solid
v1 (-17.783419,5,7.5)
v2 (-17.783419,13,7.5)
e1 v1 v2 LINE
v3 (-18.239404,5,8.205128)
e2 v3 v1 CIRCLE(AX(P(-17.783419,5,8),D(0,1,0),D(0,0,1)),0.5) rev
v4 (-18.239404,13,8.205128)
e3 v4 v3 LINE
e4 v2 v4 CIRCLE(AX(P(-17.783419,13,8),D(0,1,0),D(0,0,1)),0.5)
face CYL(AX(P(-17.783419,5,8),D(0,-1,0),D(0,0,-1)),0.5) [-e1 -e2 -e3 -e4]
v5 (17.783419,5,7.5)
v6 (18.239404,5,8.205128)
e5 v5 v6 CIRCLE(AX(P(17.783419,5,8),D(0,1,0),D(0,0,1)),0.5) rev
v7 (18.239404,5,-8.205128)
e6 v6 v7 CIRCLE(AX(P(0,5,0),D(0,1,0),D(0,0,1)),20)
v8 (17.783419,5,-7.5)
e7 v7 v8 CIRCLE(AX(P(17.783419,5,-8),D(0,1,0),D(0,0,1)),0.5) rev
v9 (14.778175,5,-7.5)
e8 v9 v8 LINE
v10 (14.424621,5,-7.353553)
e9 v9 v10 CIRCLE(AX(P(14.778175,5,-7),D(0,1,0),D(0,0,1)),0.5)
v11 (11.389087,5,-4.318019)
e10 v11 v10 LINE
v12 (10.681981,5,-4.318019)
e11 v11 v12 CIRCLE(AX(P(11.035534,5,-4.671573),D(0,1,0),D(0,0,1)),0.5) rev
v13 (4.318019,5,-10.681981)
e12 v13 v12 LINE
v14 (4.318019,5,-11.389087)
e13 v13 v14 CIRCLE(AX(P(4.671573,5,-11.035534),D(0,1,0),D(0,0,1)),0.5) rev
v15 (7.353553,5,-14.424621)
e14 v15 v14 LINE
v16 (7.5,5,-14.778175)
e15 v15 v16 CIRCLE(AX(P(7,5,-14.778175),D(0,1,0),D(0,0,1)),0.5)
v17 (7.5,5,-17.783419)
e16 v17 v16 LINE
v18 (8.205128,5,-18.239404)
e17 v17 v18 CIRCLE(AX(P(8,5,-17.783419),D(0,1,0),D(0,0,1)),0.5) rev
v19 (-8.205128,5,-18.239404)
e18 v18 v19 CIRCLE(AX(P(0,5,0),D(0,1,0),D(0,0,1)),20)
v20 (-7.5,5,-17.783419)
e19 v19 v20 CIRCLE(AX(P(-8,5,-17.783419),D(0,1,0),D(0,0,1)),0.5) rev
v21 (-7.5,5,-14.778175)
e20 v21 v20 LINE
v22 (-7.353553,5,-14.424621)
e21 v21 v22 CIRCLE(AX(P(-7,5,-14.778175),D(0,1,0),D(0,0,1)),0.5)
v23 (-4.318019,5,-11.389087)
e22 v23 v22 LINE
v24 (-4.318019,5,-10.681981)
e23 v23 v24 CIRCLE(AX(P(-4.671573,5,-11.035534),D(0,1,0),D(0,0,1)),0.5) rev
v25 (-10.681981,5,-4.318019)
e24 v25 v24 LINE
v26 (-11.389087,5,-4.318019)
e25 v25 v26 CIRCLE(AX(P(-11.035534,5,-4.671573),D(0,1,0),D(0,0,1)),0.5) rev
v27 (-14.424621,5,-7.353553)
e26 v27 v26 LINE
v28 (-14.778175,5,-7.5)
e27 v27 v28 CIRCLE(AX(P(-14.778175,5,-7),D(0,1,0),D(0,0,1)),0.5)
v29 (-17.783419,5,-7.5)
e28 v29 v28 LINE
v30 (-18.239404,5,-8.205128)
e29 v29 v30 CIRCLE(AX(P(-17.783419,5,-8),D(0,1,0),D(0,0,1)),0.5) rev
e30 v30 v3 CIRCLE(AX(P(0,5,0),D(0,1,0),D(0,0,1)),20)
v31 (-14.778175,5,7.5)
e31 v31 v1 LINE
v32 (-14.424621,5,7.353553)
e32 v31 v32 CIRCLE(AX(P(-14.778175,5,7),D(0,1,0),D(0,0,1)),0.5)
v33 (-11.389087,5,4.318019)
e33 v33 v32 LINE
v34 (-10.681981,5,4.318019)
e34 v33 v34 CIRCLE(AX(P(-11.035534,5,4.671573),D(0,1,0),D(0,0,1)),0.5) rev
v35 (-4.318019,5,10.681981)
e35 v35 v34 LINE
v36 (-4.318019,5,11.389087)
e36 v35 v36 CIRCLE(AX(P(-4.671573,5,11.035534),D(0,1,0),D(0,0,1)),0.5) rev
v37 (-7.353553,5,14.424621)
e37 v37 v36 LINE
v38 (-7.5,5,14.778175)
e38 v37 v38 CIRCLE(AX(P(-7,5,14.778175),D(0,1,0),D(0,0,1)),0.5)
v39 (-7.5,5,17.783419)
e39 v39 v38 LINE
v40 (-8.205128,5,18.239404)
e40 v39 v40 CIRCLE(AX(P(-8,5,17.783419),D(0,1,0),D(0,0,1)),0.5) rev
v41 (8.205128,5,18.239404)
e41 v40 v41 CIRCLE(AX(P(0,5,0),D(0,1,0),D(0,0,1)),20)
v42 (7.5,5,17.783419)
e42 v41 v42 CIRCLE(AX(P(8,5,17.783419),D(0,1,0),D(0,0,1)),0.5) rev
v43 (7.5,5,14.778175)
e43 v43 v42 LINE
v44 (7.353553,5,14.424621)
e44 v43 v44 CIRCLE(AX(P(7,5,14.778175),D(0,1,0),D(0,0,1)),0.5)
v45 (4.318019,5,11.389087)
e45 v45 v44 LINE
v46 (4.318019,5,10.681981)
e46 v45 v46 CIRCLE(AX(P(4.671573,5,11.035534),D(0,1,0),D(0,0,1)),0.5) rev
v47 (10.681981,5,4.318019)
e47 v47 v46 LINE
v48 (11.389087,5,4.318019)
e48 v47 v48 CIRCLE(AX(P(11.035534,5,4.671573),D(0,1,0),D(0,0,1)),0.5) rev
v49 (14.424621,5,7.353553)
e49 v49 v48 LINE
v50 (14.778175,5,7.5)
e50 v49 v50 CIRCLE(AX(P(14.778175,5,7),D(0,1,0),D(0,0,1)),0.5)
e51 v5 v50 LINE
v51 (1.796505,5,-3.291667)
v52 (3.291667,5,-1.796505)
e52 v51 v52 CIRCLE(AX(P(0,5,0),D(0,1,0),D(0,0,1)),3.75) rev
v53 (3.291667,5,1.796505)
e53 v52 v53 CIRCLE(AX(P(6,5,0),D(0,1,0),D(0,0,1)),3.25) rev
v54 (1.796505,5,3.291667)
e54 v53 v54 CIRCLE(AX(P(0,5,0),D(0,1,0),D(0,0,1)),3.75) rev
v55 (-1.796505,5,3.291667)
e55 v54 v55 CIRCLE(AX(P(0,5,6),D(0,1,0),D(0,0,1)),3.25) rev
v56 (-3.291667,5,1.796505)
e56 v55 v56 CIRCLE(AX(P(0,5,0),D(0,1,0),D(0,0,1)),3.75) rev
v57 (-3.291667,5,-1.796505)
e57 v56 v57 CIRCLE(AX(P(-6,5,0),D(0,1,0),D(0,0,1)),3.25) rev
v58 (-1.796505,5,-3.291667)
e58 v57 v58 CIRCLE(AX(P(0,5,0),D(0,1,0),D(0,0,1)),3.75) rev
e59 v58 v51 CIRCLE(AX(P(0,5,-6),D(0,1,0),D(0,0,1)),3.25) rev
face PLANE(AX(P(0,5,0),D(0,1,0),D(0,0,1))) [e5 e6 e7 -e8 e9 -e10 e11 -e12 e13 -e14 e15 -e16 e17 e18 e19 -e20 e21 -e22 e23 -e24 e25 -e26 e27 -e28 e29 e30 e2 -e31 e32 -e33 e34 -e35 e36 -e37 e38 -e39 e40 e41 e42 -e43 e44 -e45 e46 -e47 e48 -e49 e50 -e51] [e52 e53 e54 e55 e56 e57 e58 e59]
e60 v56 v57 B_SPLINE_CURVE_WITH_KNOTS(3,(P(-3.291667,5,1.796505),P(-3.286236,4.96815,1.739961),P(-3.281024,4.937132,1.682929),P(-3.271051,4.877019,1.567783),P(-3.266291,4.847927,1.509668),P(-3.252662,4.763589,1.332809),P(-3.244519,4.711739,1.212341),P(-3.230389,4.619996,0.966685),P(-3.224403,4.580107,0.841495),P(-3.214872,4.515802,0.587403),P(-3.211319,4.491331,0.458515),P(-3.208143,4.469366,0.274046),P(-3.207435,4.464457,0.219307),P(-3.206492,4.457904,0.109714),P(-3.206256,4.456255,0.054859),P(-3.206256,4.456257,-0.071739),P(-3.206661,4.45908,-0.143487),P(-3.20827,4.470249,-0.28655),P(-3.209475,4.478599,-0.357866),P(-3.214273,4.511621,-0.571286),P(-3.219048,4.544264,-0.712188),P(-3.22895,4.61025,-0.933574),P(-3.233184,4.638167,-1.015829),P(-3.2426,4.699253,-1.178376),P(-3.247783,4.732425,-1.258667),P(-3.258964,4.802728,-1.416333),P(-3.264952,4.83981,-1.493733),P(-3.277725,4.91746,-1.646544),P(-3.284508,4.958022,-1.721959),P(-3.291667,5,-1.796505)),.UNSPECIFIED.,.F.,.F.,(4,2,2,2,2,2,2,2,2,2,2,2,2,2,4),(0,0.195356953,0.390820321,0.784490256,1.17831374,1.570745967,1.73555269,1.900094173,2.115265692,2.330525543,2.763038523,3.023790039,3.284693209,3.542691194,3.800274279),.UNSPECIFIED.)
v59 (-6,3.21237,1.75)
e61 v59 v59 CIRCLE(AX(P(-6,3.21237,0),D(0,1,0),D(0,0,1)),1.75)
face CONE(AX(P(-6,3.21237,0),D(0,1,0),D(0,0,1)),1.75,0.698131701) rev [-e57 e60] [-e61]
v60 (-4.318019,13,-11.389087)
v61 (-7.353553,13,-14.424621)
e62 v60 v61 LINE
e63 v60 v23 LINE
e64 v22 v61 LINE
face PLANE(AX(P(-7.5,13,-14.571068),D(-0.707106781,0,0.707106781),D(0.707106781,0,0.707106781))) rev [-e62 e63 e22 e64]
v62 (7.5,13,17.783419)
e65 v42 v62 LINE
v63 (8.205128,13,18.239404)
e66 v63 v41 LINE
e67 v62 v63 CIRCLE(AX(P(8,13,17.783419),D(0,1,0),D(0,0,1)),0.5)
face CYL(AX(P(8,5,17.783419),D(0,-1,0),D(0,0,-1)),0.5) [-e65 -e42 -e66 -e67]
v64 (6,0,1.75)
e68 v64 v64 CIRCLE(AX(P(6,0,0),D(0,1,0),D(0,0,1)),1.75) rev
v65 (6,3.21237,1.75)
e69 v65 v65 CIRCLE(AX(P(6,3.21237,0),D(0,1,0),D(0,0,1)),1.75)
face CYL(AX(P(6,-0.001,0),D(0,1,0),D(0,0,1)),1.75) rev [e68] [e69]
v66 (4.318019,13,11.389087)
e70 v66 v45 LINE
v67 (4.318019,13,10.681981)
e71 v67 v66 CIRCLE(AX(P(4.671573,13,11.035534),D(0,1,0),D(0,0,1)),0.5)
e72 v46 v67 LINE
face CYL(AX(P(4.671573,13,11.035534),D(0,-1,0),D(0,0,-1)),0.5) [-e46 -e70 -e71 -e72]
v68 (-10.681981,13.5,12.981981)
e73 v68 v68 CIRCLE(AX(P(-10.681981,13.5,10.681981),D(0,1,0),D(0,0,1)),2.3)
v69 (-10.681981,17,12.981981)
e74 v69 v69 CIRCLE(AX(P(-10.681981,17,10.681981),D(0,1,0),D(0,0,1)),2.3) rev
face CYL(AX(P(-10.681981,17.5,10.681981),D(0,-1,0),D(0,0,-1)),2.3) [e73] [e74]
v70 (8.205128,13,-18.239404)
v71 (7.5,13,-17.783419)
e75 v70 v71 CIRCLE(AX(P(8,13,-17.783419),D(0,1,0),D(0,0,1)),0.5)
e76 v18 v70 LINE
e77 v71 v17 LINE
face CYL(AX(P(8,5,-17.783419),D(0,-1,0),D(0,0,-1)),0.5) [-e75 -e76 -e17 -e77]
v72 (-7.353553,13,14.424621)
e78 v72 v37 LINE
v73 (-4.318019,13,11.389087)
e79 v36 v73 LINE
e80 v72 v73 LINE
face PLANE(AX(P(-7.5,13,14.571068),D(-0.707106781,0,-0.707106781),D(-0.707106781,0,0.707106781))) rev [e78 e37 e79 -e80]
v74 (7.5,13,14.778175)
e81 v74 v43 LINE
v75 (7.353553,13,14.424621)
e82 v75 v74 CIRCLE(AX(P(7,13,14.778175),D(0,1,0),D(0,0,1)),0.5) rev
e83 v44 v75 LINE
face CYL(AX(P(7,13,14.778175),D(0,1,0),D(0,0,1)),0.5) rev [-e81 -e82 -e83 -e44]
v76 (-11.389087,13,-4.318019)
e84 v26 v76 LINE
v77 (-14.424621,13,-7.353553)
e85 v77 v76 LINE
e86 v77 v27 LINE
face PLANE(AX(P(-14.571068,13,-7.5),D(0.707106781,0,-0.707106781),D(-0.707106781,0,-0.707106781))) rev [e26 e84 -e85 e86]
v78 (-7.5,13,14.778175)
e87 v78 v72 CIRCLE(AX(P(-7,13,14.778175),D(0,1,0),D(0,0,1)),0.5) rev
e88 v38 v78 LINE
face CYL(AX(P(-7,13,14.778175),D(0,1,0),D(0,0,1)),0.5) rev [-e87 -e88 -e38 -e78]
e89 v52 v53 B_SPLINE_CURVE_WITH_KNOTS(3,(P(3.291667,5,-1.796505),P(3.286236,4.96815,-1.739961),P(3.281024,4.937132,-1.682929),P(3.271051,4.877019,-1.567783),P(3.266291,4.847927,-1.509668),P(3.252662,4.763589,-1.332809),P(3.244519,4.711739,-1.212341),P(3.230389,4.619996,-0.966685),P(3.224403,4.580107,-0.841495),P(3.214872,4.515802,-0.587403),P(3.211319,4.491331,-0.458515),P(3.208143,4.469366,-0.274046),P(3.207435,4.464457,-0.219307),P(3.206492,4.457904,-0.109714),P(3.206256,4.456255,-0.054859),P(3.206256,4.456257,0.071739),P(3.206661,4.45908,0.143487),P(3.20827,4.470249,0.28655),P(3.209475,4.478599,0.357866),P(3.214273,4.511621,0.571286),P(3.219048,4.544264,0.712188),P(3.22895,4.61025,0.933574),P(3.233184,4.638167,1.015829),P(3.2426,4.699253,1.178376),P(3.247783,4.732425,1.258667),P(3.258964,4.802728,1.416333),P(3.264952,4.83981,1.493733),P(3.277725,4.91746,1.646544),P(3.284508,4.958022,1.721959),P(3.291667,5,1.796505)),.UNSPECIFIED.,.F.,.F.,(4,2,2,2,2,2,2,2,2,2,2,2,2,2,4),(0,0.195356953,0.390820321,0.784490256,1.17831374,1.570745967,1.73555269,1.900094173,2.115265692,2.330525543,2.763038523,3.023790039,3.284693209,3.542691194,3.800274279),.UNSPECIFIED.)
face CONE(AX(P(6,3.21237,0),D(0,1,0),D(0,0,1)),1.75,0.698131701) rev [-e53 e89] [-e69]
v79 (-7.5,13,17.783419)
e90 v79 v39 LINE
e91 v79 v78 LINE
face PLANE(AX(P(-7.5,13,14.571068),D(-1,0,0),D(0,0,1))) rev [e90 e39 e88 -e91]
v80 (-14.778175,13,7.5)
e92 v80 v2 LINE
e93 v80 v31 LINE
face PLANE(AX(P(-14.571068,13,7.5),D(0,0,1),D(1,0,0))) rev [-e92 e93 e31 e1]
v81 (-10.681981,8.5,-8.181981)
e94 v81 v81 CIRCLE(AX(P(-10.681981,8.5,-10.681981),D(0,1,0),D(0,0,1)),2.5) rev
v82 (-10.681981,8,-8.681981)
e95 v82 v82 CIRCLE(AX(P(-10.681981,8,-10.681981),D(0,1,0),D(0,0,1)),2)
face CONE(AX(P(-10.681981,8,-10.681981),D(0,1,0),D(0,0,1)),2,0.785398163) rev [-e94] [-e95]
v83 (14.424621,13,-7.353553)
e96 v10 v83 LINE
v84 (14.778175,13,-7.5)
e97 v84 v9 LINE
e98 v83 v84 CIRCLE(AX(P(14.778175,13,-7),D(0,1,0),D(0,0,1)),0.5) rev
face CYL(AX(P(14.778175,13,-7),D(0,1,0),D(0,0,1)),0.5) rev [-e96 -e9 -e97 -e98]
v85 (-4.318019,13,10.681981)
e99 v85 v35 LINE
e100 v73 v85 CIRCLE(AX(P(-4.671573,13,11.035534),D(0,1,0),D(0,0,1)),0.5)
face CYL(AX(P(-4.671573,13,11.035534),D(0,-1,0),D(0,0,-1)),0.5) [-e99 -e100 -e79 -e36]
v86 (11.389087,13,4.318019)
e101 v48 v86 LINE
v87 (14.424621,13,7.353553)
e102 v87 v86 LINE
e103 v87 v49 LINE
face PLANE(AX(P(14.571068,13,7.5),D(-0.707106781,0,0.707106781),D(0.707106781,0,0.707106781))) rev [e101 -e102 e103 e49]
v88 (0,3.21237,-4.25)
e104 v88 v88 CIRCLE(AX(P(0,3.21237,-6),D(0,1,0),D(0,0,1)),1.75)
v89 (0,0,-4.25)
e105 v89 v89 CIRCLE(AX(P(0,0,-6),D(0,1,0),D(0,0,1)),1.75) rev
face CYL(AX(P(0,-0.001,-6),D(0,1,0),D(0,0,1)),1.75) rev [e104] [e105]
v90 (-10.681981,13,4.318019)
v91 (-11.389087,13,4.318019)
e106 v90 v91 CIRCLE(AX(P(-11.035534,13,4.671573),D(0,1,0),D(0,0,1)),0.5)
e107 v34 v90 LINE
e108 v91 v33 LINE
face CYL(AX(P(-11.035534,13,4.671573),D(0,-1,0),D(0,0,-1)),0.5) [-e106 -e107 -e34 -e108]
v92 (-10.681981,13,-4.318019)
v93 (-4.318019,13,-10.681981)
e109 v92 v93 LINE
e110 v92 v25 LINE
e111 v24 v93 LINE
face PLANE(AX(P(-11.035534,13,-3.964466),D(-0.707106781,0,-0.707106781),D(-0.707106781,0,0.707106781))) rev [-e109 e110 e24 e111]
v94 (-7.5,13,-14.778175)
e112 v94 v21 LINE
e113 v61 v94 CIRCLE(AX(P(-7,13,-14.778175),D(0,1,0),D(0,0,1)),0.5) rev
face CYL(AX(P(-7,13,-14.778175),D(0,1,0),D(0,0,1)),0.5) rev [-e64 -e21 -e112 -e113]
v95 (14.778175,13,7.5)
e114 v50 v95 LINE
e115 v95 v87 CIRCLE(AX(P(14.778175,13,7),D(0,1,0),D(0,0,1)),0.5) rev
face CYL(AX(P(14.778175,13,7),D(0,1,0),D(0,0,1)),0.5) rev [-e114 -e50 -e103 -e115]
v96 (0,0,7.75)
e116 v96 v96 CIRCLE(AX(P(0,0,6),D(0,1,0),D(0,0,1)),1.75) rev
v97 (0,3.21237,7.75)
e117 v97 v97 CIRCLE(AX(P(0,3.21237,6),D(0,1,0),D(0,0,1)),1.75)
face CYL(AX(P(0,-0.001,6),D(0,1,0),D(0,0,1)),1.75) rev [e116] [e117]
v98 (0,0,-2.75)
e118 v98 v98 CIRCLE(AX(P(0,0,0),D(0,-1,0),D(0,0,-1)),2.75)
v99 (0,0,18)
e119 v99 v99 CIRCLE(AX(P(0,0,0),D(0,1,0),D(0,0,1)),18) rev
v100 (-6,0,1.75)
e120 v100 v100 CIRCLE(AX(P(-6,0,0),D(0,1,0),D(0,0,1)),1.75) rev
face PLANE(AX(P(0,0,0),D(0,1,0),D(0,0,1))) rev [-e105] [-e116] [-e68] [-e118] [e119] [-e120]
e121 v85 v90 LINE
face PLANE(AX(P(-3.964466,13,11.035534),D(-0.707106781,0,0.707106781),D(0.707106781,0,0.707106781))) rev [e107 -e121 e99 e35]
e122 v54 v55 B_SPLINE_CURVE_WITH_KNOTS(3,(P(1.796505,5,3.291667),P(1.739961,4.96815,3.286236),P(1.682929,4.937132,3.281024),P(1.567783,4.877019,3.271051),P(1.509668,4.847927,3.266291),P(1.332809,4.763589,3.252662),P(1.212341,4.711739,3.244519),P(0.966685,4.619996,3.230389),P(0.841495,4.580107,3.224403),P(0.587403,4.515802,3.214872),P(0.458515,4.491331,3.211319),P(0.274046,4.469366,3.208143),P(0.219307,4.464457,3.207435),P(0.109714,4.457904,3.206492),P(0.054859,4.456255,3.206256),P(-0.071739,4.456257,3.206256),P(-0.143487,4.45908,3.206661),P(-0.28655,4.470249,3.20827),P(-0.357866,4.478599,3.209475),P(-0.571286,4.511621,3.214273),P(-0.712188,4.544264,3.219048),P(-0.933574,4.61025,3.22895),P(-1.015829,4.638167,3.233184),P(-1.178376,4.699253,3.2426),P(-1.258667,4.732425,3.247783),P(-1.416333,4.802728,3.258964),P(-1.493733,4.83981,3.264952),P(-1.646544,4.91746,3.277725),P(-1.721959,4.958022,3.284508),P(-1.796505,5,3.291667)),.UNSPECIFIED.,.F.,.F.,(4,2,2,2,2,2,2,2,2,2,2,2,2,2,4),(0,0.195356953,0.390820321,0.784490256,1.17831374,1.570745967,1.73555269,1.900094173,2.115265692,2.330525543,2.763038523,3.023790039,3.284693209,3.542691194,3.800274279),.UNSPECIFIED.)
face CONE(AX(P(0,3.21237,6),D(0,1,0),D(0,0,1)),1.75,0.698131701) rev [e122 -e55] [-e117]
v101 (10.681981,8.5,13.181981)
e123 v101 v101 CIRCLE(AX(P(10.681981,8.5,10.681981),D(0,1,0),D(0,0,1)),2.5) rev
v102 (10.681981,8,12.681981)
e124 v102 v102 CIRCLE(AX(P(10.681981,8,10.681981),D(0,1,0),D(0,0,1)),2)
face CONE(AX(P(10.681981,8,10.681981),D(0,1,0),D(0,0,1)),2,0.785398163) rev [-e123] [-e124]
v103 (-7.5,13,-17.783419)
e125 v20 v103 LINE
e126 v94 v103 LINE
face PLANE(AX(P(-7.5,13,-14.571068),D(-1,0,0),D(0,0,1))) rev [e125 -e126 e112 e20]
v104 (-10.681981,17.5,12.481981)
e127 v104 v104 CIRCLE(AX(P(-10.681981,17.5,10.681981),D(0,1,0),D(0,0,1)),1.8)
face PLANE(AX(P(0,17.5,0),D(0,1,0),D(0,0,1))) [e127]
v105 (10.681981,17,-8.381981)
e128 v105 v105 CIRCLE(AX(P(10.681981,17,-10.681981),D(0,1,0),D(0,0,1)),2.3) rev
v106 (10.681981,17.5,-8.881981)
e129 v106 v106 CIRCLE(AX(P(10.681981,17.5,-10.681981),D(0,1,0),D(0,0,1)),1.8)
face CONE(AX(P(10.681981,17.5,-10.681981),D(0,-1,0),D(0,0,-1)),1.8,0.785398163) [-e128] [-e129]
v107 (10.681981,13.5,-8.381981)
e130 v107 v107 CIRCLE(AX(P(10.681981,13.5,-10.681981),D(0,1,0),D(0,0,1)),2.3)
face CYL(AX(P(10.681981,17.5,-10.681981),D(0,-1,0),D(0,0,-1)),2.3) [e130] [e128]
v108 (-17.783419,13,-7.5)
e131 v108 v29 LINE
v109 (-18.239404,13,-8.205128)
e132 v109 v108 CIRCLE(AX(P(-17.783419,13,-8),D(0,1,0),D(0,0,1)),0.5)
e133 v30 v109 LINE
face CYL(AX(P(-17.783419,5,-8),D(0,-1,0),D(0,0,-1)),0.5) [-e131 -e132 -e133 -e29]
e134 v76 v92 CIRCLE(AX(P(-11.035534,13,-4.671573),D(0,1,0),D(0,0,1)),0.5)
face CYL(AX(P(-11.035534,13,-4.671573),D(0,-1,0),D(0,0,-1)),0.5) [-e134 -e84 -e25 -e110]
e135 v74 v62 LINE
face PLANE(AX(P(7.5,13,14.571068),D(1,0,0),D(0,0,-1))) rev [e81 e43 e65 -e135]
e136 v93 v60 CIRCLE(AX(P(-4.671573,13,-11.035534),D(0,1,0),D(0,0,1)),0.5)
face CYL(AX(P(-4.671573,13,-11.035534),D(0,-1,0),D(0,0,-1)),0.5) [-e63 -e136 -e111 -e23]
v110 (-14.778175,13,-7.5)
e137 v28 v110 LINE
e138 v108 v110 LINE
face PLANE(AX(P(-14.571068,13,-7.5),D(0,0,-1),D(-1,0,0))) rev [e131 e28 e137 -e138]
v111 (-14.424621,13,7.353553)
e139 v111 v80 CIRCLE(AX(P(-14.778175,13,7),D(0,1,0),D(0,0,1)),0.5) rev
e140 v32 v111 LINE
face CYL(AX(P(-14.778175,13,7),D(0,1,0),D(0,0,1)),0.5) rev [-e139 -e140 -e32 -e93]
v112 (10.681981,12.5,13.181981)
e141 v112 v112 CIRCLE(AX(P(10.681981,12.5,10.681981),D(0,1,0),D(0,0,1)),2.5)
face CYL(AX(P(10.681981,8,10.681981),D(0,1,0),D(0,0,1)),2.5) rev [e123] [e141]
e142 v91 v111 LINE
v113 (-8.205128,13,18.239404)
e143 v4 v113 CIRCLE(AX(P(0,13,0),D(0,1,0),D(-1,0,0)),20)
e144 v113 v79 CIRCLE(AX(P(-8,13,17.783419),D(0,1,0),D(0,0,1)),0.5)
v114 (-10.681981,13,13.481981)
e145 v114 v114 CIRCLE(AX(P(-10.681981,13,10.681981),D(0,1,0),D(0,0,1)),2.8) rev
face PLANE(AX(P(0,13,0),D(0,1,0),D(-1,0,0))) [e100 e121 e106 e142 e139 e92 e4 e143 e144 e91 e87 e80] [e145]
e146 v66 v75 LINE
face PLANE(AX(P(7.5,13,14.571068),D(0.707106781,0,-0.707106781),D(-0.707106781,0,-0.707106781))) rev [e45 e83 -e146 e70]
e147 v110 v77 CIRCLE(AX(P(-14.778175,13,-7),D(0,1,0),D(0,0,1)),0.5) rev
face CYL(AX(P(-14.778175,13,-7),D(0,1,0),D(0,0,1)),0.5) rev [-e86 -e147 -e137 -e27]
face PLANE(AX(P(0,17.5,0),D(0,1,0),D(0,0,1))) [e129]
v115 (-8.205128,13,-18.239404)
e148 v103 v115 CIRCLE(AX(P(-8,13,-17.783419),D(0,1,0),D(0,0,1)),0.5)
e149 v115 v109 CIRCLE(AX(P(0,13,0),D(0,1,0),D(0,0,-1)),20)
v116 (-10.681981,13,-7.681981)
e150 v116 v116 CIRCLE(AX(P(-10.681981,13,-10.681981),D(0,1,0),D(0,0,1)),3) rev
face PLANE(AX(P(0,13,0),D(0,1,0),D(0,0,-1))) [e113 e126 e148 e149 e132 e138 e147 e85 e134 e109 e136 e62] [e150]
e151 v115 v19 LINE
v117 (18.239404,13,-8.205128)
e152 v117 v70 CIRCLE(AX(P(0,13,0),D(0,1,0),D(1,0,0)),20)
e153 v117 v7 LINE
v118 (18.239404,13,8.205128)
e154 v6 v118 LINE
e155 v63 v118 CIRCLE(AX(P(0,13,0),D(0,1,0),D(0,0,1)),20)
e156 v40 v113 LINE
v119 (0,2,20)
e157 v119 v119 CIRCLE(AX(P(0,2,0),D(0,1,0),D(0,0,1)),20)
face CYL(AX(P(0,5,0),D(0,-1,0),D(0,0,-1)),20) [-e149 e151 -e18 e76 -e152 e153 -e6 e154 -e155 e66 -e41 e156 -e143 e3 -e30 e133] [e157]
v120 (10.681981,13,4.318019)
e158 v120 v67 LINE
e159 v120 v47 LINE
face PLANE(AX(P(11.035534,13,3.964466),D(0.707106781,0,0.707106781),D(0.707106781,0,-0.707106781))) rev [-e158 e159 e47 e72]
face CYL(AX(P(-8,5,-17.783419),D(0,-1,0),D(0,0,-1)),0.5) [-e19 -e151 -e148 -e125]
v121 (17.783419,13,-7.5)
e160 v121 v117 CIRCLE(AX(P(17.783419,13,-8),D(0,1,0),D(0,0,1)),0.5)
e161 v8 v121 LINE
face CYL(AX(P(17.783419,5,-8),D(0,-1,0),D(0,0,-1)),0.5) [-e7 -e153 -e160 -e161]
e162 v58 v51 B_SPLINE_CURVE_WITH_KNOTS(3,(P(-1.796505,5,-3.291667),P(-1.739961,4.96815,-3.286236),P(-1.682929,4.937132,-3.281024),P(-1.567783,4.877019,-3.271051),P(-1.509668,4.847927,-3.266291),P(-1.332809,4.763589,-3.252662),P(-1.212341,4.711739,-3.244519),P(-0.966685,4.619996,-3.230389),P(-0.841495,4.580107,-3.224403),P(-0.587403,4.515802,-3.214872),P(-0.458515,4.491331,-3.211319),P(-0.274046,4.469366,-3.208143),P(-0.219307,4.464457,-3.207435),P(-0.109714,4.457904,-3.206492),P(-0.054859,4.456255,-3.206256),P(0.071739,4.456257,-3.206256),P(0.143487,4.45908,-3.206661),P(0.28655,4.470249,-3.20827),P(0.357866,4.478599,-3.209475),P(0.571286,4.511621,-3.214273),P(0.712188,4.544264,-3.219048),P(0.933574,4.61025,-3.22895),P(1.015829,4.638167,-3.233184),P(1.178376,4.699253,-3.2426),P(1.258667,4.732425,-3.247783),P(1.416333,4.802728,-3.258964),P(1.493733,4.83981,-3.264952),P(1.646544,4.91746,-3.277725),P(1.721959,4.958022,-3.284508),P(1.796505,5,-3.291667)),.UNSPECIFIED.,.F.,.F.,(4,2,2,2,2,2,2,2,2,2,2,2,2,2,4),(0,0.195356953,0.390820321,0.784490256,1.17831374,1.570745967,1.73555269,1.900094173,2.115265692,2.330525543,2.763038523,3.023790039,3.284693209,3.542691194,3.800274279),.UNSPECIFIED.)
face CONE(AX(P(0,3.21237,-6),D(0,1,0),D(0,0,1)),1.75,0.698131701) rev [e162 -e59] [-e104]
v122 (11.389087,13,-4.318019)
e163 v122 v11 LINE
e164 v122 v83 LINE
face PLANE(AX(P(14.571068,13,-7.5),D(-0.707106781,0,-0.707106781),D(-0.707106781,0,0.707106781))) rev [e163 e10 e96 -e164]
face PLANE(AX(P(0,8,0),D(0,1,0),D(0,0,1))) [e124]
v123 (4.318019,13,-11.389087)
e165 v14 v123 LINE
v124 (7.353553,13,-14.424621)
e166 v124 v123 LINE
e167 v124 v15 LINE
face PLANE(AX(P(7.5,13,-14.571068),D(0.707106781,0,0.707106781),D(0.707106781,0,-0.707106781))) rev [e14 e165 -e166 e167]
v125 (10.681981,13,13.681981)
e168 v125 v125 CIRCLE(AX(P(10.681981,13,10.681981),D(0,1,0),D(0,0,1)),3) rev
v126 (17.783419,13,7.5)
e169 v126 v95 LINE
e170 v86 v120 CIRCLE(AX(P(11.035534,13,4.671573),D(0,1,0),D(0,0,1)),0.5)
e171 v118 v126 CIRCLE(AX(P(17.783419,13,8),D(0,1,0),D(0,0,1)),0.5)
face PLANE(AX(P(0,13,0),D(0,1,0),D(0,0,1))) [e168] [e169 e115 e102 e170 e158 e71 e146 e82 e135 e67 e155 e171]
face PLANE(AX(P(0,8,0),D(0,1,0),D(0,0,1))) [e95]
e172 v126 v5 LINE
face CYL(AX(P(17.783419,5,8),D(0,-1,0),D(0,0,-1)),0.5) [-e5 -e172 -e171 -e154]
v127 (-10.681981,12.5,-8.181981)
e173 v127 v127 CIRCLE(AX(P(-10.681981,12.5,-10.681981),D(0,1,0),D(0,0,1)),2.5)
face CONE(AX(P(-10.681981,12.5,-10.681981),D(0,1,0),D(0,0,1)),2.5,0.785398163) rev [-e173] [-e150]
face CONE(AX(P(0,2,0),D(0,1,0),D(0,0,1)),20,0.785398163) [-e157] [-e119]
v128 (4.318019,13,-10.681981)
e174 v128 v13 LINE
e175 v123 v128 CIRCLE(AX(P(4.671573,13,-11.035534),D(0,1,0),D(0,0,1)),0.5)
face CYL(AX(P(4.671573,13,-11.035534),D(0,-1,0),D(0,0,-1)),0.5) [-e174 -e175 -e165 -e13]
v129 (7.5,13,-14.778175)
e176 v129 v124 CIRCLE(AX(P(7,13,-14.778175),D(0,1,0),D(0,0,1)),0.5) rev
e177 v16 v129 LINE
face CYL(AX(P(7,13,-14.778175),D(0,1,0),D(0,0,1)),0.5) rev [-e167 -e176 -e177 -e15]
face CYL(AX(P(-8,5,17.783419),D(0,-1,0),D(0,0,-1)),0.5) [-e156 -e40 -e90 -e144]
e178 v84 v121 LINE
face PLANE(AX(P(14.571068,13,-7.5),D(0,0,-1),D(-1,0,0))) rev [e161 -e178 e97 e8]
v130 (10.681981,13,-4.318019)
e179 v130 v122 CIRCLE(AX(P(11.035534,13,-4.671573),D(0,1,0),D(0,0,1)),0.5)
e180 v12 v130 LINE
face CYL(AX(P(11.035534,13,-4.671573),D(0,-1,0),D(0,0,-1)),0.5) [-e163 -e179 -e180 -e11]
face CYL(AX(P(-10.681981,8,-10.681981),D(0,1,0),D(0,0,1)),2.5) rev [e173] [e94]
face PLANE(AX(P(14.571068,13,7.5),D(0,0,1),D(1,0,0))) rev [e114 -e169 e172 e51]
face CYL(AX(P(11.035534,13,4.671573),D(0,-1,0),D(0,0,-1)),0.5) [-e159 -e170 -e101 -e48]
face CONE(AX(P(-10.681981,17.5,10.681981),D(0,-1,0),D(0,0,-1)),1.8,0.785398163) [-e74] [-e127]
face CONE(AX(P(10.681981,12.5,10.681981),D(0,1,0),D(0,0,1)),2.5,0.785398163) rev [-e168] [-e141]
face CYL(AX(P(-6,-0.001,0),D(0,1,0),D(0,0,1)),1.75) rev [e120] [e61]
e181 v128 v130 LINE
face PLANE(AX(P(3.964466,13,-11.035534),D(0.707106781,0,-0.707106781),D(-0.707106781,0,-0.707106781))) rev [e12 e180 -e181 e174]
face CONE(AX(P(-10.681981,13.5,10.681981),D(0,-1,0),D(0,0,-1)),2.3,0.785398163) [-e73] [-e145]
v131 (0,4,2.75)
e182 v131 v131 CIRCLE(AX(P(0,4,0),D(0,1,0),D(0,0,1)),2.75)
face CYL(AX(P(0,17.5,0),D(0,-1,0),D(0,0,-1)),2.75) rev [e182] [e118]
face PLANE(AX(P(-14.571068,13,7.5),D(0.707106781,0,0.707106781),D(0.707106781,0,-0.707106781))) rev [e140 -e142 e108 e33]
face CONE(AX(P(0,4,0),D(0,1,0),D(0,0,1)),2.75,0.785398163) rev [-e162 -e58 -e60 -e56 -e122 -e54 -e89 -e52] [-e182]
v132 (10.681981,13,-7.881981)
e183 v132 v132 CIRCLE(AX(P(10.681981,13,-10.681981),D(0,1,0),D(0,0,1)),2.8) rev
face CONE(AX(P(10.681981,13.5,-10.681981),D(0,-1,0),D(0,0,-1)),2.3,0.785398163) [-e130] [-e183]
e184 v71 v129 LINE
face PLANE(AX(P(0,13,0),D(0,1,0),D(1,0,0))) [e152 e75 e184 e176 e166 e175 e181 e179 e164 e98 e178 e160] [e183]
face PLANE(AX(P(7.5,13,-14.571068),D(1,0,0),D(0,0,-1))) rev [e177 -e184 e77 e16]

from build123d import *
from OCP.BRepFilletAPI import BRepFilletAPI_MakeChamfer

# Parameters (mm, degrees)
SKETCH_1_R                             = 20
EXTRUDE_1_DEPTH                        = 5
EXTRUDE_2_DEPTH                        = 8
FILLET_1_R                             = 0.5
PATTERN_START                          = 5
PATTERN_CIRCULAR_1_DEPTH               = 8
SKETCH_3_R                             = 2.5000000000000004
CUT_EXTRUDE_1_DEPTH                    = 5
EXTRUDE_START                          = 4.5
SKETCH_3_3_R                           = 2.5000000000000004
SKETCH_3_3_R_2                         = 2.2999999999999994
EXTRUDE_3_DEPTH                        = 4.5
CHAMFER_1_SIZE                         = 0.5
SKETCH_4_R                             = 2.75
CUT_EXTRUDE_2_DEPTH                    = 34.26033673912518
CHAMFER_2_SIZE                         = 2
CUT_EXTRUDE_3_REACH                    = 32.923
SKETCH_5_R                             = 1.75
CHAMFER_3_SIZE2                        = 1.787630389
CHAMFER_3_SIZE                         = 1.5
PATTERN_CIRCULAR_2_COUNT               = 4
CHAMFER_3_OF_PATTERN_CIRCULAR_2_SIZE   = 1.5
CHAMFER_3_OF_PATTERN_CIRCULAR_2_SIZE_2 = 1.787630389
CHAMFER_4_SIZE                         = 1


# Read off the part's stored shape, not the designer's step: 阵列(圆周)1
# Some blends are built 0.0001 mm under size
with BuildPart() as part:
    # 草图1 → 凸台-拉伸1 (new body)
    with BuildSketch(Plane(origin=(0, 0, 0), x_dir=(1, 0, 0), z_dir=(0, 1, 0))):
        with Locations(Location((0, 0, 0), (0, 0, 270))):
            Circle(SKETCH_1_R)
    extrude(amount=EXTRUDE_1_DEPTH)

    # 草图2 → 凸台-拉伸2 (add)
    with BuildSketch(Plane(origin=(0, 5, 0), x_dir=(1, 0, 0), z_dir=(0, 1, 0))):
        with BuildLine():
            Line((14.57106781186547, -7.500000000000001), (11.035533905932741, -3.9644660940672627))
            Line((11.035533905932741, -3.9644660940672627), (3.9644660940672627, -11.03553390593274))
            Line((3.9644660940672627, -11.03553390593274), (7.500000000000001, -14.571067811865477))
            Line((7.500000000000001, -14.571067811865477), (7.500000000000001, -18.540496217739157))
            ThreePointArc((7.500000000000001, -18.540496217739157), (14.142135623730951, -14.14213562373095), (18.540496217739157, -7.500000000000001))
            Line((18.540496217739157, -7.500000000000001), (14.57106781186547, -7.500000000000001))
        make_face()
    extrude(amount=EXTRUDE_2_DEPTH)

    # 圆角1
    fillet_1_edges = [part.edges().sort_by_distance(p)[0] for p in [
        (7.500000000000001, 9, 14.571067811865477),
        (7.500000000000001, 9, 18.540496217739157),
        (18.540496217739154, 9, 7.500000000000002),
        (14.57106781186547, 9, 7.500000000000001),
        (11.035533905932741, 9, 3.9644660940672627),
        (3.9644660940672627, 9, 11.03553390593274),
    ]]
    fillet(fillet_1_edges, radius=FILLET_1_R)

    # 阵列(圆周)1 outline → 阵列(圆周)1 (add)
    with BuildSketch(Plane(origin=(0, 0, 0), x_dir=(1, 0, 0), z_dir=(0, 1, 0)).offset(PATTERN_START)):
        with BuildLine():
            ThreePointArc((17.783419244, 7.5), (18.203278805, 7.728489505), (18.239404353, 8.205128205))
            ThreePointArc((18.239404353, 8.205128205), (14.142135624, 14.142135624), (8.205128205, 18.239404353))
            ThreePointArc((8.205128205, 18.239404353), (7.728489505, 18.203278805), (7.5, 17.783419244))
            Line((7.5, 17.783419244), (7.5, 14.778174593))
            ThreePointArc((7.5, 14.778174593), (7.461939766, 14.586832877), (7.353553391, 14.424621202))
            Line((7.353553391, 14.424621202), (4.318019485, 11.389087297))
            ThreePointArc((4.318019485, 11.389087297), (4.171572875, 11.035533906), (4.318019485, 10.681980515))
            Line((4.318019485, 10.681980515), (10.681980515, 4.318019485))
            ThreePointArc((10.681980515, 4.318019485), (11.035533906, 4.171572875), (11.389087297, 4.318019485))
            Line((11.389087297, 4.318019485), (14.424621202, 7.353553391))
            ThreePointArc((14.424621202, 7.353553391), (14.586832877, 7.461939766), (14.778174593, 7.5))
            Line((14.778174593, 7.5), (17.783419244, 7.5))
        make_face()
        with BuildLine():
            ThreePointArc((-18.239404353, -8.205128205), (-14.142135624, -14.142135624), (-8.205128205, -18.239404353))
            ThreePointArc((-8.205128205, -18.239404353), (-7.728489505, -18.203278805), (-7.5, -17.783419244))
            Line((-7.5, -17.783419244), (-7.5, -14.778174593))
            ThreePointArc((-7.5, -14.778174593), (-7.461939766, -14.586832877), (-7.353553391, -14.424621202))
            Line((-7.353553391, -14.424621202), (-4.318019485, -11.389087297))
            ThreePointArc((-4.318019485, -11.389087297), (-4.171572875, -11.035533906), (-4.318019485, -10.681980515))
            Line((-4.318019485, -10.681980515), (-10.681980515, -4.318019485))
            ThreePointArc((-10.681980515, -4.318019485), (-11.035533906, -4.171572875), (-11.389087297, -4.318019485))
            Line((-11.389087297, -4.318019485), (-14.424621202, -7.353553391))
            ThreePointArc((-14.424621202, -7.353553391), (-14.586832877, -7.461939766), (-14.778174593, -7.5))
            Line((-14.778174593, -7.5), (-17.783419244, -7.5))
            ThreePointArc((-17.783419244, -7.5), (-18.203278805, -7.728489505), (-18.239404353, -8.205128205))
        make_face()
        with BuildLine():
            ThreePointArc((-7.5, 17.783419244), (-7.728489505, 18.203278805), (-8.205128205, 18.239404353))
            ThreePointArc((-8.205128205, 18.239404353), (-14.142135624, 14.142135624), (-18.239404353, 8.205128205))
            ThreePointArc((-18.239404353, 8.205128205), (-18.203278805, 7.728489505), (-17.783419244, 7.5))
            Line((-17.783419244, 7.5), (-14.778174593, 7.5))
            ThreePointArc((-14.778174593, 7.5), (-14.586832877, 7.461939766), (-14.424621202, 7.353553391))
            Line((-14.424621202, 7.353553391), (-11.389087297, 4.318019485))
            ThreePointArc((-11.389087297, 4.318019485), (-11.035533906, 4.171572875), (-10.681980515, 4.318019485))
            Line((-10.681980515, 4.318019485), (-4.318019485, 10.681980515))
            ThreePointArc((-4.318019485, 10.681980515), (-4.171572875, 11.035533906), (-4.318019485, 11.389087297))
            Line((-4.318019485, 11.389087297), (-7.353553391, 14.424621202))
            ThreePointArc((-7.353553391, 14.424621202), (-7.461939766, 14.586832877), (-7.5, 14.778174593))
            Line((-7.5, 14.778174593), (-7.5, 17.783419244))
        make_face()
    extrude(amount=PATTERN_CIRCULAR_1_DEPTH)

    # 草图3 → 切除-拉伸1 (cut)
    with BuildSketch(Plane(origin=(0, 13.000000000000002, 0), x_dir=(1, 0, 0), z_dir=(0, 1, 0))):
        with Locations(Location((-10.681980515339466, 10.681980515339463, 0), (0, 0, 270))):
            Circle(SKETCH_3_R)
        with Locations(Location((10.681980515339466, -10.681980515339463, 0), (0, 0, 270))):
            Circle(SKETCH_3_R)
    extrude(amount=-CUT_EXTRUDE_1_DEPTH, mode=Mode.SUBTRACT)

    # 草图3<3> → 凸台-拉伸3 (add)
    with BuildSketch(Plane(origin=(0, 13.000000000000002, 0), x_dir=(1, 0, 0), z_dir=(0, 1, 0)).offset(EXTRUDE_START)):
        with Locations(Location((10.681980515339466, -10.681980515339463, 0), (0, 0, 270))):
            Circle(SKETCH_3_3_R)
        with Locations(Location((-10.681980515339466, 10.681980515339463, 0), (0, 0, 270))):
            Circle(SKETCH_3_3_R)
        with Locations(Location((10.681980515339466, 10.681980515339463, 0), (0, 0, 270))):
            Circle(SKETCH_3_3_R_2)
        with Locations(Location((-10.681980515339465, -10.681980515339465, 0), (0, 0, 270))):
            Circle(SKETCH_3_3_R_2)
    extrude(amount=-EXTRUDE_3_DEPTH)


with BuildPart() as extrude_3_kept_piece:
    # of the separate pieces the step leaves, the one the design keeps (extrude_3_pieces_kept)
    add(part.part.solids().sort_by_distance((8.205128205, 5, 18.239404353))[0])

    # 倒角1
    chamfer_1_edges = [extrude_3_kept_piece.edges().sort_by_distance(p)[0] for p in [
        (-10.681980515339466, 8.000000000000002, -13.181980515339463),
        (-10.681980515339466, 13.000000000000002, -13.181980515339463),
        (10.681980515339466, 8.000000000000002, 8.181980515339463),
        (10.681980515339466, 13.000000000000002, 8.181980515339463),
        (10.681980515339466, 13.000000000000002, -12.981980515339462),
        (10.681980515339466, 17.5, -12.981980515339462),
        (-10.681980515339465, 13.000000000000002, 8.381980515339466),
        (-10.681980515339465, 17.5, 8.381980515339466),
    ]]
    chamfer(chamfer_1_edges, length=CHAMFER_1_SIZE)

    # 草图4 → 切除-拉伸2 (cut, through all)
    with BuildSketch(Plane.XZ):
        with Locations(Location((0, 0, 0), (0, 0, 270))):
            Circle(SKETCH_4_R)
    extrude(amount=-CUT_EXTRUDE_2_DEPTH, mode=Mode.SUBTRACT)

    # 倒角2
    chamfer_2_edges = [extrude_3_kept_piece.edges().sort_by_distance(p)[0] for p in [
        (6.12e-15, 0, -20),
    ]]
    chamfer(chamfer_2_edges, length=CHAMFER_2_SIZE)

    # 草图5 → 切除-拉伸3 (cut, up to next)
    with BuildSketch(Plane(origin=(0, 5, 0), x_dir=(1, 0, 0), z_dir=(0, 1, 0)), mode=Mode.PRIVATE) as cut_extrude_3_sk1:
        with Locations(Location((6, 0, 0), (0, 0, 270))):
            Circle(SKETCH_5_R)
    cut_extrude_3_tool1 = extrude(cut_extrude_3_sk1.sketch, amount=-CUT_EXTRUDE_3_REACH, mode=Mode.PRIVATE) & extrude_3_kept_piece.part
    cut_extrude_3 = cut_extrude_3_tool1.solids().sort_by_distance((6, 5, 0))[0]
    add(cut_extrude_3, mode=Mode.SUBTRACT)

    # 倒角3
    chamfer_3_edges = [extrude_3_kept_piece.edges().sort_by_distance(p)[0] for p in [
        (6.000000000000001, 5, -1.75),
    ]]
    chamfer_3_side = [extrude_3_kept_piece.faces().sort_by_distance(p)[0] for p in [
        (6.000000000000001, 5, -1.78),
    ]]
    chamfer(chamfer_3_edges, length=CHAMFER_3_SIZE - 0.0001, length2=CHAMFER_3_SIZE2 - 0.0001, reference=chamfer_3_side[0])  # a hair under: the kernel refuses the full size

    # 阵列(圆周)2: 切除-拉伸3 ×4 about axis
    pattern_circular_2_axis = Axis((0, 0, -1.047e-14), (0, 1, 0))
    for i in range(1, PATTERN_CIRCULAR_2_COUNT):
        add(cut_extrude_3.rotate(pattern_circular_2_axis, i * 360 / PATTERN_CIRCULAR_2_COUNT), mode=Mode.SUBTRACT)

    # 倒角3 of 阵列(圆周)2
    chamfer_3_of_pattern_circular_2_edges_1 = [extrude_3_kept_piece.edges().sort_by_distance(p)[0] for p in [
        (-1.749999999999989, 5, -6.0000000000000115),
    ]]
    chamfer_3_of_pattern_circular_2_side_1 = [extrude_3_kept_piece.faces().sort_by_distance(p)[0] for p in [
        (-1.779999999999989, 5, -6.0000000000000115),
    ]]
    chamfer_3_of_pattern_circular_2_edges_2 = [extrude_3_kept_piece.edges().sort_by_distance(p)[0] for p in [
        (-6.000000000000001, 5, 1.7499999999999785),
    ]]
    chamfer_3_of_pattern_circular_2_side_2 = [extrude_3_kept_piece.faces().sort_by_distance(p)[0] for p in [
        (-6.000000000000001, 5, 1.7799999999999785),
    ]]
    chamfer_3_of_pattern_circular_2_edges_3 = [extrude_3_kept_piece.edges().sort_by_distance(p)[0] for p in [
        (1.7499999999999882, 5, 5.99999999999999),
    ]]
    chamfer_3_of_pattern_circular_2_side_3 = [extrude_3_kept_piece.faces().sort_by_distance(p)[0] for p in [
        (1.7799999999999883, 5, 5.99999999999999),
    ]]
    chamfer_3_of_pattern_circular_2 = BRepFilletAPI_MakeChamfer(extrude_3_kept_piece.part.solid().wrapped)
    for e in chamfer_3_of_pattern_circular_2_edges_1:
        chamfer_3_of_pattern_circular_2.Add(CHAMFER_3_OF_PATTERN_CIRCULAR_2_SIZE - 0.0001, CHAMFER_3_OF_PATTERN_CIRCULAR_2_SIZE_2 - 0.0001, e.wrapped, chamfer_3_of_pattern_circular_2_side_1[0].wrapped)
    for e in chamfer_3_of_pattern_circular_2_edges_2:
        chamfer_3_of_pattern_circular_2.Add(CHAMFER_3_OF_PATTERN_CIRCULAR_2_SIZE - 0.0001, CHAMFER_3_OF_PATTERN_CIRCULAR_2_SIZE_2 - 0.0001, e.wrapped, chamfer_3_of_pattern_circular_2_side_2[0].wrapped)
    for e in chamfer_3_of_pattern_circular_2_edges_3:
        chamfer_3_of_pattern_circular_2.Add(CHAMFER_3_OF_PATTERN_CIRCULAR_2_SIZE - 0.0001, CHAMFER_3_OF_PATTERN_CIRCULAR_2_SIZE_2 - 0.0001, e.wrapped, chamfer_3_of_pattern_circular_2_side_3[0].wrapped)
    add(Compound.cast(chamfer_3_of_pattern_circular_2.Shape()), mode=Mode.REPLACE)  # a hair under: the kernel refuses the full size

    # 倒角4
    # the kernel refuses this chamfer: 1 mm, written as the material it takes off along each edge
    with BuildSketch(Plane(origin=(0, 5, 0), x_dir=(-1.8e-16, 0, -1), z_dir=(-1, 0, 1.8e-16))) as chamfer_4_piece_1:
        Polygon((2.75 + CHAMFER_4_SIZE, 0), (2.75, CHAMFER_4_SIZE), (2.75, 0), align=None)
    revolve(axis=Axis((0, 5, 0), (0, -1, 0)), mode=Mode.SUBTRACT)


solid = extrude_3_kept_piece.part
